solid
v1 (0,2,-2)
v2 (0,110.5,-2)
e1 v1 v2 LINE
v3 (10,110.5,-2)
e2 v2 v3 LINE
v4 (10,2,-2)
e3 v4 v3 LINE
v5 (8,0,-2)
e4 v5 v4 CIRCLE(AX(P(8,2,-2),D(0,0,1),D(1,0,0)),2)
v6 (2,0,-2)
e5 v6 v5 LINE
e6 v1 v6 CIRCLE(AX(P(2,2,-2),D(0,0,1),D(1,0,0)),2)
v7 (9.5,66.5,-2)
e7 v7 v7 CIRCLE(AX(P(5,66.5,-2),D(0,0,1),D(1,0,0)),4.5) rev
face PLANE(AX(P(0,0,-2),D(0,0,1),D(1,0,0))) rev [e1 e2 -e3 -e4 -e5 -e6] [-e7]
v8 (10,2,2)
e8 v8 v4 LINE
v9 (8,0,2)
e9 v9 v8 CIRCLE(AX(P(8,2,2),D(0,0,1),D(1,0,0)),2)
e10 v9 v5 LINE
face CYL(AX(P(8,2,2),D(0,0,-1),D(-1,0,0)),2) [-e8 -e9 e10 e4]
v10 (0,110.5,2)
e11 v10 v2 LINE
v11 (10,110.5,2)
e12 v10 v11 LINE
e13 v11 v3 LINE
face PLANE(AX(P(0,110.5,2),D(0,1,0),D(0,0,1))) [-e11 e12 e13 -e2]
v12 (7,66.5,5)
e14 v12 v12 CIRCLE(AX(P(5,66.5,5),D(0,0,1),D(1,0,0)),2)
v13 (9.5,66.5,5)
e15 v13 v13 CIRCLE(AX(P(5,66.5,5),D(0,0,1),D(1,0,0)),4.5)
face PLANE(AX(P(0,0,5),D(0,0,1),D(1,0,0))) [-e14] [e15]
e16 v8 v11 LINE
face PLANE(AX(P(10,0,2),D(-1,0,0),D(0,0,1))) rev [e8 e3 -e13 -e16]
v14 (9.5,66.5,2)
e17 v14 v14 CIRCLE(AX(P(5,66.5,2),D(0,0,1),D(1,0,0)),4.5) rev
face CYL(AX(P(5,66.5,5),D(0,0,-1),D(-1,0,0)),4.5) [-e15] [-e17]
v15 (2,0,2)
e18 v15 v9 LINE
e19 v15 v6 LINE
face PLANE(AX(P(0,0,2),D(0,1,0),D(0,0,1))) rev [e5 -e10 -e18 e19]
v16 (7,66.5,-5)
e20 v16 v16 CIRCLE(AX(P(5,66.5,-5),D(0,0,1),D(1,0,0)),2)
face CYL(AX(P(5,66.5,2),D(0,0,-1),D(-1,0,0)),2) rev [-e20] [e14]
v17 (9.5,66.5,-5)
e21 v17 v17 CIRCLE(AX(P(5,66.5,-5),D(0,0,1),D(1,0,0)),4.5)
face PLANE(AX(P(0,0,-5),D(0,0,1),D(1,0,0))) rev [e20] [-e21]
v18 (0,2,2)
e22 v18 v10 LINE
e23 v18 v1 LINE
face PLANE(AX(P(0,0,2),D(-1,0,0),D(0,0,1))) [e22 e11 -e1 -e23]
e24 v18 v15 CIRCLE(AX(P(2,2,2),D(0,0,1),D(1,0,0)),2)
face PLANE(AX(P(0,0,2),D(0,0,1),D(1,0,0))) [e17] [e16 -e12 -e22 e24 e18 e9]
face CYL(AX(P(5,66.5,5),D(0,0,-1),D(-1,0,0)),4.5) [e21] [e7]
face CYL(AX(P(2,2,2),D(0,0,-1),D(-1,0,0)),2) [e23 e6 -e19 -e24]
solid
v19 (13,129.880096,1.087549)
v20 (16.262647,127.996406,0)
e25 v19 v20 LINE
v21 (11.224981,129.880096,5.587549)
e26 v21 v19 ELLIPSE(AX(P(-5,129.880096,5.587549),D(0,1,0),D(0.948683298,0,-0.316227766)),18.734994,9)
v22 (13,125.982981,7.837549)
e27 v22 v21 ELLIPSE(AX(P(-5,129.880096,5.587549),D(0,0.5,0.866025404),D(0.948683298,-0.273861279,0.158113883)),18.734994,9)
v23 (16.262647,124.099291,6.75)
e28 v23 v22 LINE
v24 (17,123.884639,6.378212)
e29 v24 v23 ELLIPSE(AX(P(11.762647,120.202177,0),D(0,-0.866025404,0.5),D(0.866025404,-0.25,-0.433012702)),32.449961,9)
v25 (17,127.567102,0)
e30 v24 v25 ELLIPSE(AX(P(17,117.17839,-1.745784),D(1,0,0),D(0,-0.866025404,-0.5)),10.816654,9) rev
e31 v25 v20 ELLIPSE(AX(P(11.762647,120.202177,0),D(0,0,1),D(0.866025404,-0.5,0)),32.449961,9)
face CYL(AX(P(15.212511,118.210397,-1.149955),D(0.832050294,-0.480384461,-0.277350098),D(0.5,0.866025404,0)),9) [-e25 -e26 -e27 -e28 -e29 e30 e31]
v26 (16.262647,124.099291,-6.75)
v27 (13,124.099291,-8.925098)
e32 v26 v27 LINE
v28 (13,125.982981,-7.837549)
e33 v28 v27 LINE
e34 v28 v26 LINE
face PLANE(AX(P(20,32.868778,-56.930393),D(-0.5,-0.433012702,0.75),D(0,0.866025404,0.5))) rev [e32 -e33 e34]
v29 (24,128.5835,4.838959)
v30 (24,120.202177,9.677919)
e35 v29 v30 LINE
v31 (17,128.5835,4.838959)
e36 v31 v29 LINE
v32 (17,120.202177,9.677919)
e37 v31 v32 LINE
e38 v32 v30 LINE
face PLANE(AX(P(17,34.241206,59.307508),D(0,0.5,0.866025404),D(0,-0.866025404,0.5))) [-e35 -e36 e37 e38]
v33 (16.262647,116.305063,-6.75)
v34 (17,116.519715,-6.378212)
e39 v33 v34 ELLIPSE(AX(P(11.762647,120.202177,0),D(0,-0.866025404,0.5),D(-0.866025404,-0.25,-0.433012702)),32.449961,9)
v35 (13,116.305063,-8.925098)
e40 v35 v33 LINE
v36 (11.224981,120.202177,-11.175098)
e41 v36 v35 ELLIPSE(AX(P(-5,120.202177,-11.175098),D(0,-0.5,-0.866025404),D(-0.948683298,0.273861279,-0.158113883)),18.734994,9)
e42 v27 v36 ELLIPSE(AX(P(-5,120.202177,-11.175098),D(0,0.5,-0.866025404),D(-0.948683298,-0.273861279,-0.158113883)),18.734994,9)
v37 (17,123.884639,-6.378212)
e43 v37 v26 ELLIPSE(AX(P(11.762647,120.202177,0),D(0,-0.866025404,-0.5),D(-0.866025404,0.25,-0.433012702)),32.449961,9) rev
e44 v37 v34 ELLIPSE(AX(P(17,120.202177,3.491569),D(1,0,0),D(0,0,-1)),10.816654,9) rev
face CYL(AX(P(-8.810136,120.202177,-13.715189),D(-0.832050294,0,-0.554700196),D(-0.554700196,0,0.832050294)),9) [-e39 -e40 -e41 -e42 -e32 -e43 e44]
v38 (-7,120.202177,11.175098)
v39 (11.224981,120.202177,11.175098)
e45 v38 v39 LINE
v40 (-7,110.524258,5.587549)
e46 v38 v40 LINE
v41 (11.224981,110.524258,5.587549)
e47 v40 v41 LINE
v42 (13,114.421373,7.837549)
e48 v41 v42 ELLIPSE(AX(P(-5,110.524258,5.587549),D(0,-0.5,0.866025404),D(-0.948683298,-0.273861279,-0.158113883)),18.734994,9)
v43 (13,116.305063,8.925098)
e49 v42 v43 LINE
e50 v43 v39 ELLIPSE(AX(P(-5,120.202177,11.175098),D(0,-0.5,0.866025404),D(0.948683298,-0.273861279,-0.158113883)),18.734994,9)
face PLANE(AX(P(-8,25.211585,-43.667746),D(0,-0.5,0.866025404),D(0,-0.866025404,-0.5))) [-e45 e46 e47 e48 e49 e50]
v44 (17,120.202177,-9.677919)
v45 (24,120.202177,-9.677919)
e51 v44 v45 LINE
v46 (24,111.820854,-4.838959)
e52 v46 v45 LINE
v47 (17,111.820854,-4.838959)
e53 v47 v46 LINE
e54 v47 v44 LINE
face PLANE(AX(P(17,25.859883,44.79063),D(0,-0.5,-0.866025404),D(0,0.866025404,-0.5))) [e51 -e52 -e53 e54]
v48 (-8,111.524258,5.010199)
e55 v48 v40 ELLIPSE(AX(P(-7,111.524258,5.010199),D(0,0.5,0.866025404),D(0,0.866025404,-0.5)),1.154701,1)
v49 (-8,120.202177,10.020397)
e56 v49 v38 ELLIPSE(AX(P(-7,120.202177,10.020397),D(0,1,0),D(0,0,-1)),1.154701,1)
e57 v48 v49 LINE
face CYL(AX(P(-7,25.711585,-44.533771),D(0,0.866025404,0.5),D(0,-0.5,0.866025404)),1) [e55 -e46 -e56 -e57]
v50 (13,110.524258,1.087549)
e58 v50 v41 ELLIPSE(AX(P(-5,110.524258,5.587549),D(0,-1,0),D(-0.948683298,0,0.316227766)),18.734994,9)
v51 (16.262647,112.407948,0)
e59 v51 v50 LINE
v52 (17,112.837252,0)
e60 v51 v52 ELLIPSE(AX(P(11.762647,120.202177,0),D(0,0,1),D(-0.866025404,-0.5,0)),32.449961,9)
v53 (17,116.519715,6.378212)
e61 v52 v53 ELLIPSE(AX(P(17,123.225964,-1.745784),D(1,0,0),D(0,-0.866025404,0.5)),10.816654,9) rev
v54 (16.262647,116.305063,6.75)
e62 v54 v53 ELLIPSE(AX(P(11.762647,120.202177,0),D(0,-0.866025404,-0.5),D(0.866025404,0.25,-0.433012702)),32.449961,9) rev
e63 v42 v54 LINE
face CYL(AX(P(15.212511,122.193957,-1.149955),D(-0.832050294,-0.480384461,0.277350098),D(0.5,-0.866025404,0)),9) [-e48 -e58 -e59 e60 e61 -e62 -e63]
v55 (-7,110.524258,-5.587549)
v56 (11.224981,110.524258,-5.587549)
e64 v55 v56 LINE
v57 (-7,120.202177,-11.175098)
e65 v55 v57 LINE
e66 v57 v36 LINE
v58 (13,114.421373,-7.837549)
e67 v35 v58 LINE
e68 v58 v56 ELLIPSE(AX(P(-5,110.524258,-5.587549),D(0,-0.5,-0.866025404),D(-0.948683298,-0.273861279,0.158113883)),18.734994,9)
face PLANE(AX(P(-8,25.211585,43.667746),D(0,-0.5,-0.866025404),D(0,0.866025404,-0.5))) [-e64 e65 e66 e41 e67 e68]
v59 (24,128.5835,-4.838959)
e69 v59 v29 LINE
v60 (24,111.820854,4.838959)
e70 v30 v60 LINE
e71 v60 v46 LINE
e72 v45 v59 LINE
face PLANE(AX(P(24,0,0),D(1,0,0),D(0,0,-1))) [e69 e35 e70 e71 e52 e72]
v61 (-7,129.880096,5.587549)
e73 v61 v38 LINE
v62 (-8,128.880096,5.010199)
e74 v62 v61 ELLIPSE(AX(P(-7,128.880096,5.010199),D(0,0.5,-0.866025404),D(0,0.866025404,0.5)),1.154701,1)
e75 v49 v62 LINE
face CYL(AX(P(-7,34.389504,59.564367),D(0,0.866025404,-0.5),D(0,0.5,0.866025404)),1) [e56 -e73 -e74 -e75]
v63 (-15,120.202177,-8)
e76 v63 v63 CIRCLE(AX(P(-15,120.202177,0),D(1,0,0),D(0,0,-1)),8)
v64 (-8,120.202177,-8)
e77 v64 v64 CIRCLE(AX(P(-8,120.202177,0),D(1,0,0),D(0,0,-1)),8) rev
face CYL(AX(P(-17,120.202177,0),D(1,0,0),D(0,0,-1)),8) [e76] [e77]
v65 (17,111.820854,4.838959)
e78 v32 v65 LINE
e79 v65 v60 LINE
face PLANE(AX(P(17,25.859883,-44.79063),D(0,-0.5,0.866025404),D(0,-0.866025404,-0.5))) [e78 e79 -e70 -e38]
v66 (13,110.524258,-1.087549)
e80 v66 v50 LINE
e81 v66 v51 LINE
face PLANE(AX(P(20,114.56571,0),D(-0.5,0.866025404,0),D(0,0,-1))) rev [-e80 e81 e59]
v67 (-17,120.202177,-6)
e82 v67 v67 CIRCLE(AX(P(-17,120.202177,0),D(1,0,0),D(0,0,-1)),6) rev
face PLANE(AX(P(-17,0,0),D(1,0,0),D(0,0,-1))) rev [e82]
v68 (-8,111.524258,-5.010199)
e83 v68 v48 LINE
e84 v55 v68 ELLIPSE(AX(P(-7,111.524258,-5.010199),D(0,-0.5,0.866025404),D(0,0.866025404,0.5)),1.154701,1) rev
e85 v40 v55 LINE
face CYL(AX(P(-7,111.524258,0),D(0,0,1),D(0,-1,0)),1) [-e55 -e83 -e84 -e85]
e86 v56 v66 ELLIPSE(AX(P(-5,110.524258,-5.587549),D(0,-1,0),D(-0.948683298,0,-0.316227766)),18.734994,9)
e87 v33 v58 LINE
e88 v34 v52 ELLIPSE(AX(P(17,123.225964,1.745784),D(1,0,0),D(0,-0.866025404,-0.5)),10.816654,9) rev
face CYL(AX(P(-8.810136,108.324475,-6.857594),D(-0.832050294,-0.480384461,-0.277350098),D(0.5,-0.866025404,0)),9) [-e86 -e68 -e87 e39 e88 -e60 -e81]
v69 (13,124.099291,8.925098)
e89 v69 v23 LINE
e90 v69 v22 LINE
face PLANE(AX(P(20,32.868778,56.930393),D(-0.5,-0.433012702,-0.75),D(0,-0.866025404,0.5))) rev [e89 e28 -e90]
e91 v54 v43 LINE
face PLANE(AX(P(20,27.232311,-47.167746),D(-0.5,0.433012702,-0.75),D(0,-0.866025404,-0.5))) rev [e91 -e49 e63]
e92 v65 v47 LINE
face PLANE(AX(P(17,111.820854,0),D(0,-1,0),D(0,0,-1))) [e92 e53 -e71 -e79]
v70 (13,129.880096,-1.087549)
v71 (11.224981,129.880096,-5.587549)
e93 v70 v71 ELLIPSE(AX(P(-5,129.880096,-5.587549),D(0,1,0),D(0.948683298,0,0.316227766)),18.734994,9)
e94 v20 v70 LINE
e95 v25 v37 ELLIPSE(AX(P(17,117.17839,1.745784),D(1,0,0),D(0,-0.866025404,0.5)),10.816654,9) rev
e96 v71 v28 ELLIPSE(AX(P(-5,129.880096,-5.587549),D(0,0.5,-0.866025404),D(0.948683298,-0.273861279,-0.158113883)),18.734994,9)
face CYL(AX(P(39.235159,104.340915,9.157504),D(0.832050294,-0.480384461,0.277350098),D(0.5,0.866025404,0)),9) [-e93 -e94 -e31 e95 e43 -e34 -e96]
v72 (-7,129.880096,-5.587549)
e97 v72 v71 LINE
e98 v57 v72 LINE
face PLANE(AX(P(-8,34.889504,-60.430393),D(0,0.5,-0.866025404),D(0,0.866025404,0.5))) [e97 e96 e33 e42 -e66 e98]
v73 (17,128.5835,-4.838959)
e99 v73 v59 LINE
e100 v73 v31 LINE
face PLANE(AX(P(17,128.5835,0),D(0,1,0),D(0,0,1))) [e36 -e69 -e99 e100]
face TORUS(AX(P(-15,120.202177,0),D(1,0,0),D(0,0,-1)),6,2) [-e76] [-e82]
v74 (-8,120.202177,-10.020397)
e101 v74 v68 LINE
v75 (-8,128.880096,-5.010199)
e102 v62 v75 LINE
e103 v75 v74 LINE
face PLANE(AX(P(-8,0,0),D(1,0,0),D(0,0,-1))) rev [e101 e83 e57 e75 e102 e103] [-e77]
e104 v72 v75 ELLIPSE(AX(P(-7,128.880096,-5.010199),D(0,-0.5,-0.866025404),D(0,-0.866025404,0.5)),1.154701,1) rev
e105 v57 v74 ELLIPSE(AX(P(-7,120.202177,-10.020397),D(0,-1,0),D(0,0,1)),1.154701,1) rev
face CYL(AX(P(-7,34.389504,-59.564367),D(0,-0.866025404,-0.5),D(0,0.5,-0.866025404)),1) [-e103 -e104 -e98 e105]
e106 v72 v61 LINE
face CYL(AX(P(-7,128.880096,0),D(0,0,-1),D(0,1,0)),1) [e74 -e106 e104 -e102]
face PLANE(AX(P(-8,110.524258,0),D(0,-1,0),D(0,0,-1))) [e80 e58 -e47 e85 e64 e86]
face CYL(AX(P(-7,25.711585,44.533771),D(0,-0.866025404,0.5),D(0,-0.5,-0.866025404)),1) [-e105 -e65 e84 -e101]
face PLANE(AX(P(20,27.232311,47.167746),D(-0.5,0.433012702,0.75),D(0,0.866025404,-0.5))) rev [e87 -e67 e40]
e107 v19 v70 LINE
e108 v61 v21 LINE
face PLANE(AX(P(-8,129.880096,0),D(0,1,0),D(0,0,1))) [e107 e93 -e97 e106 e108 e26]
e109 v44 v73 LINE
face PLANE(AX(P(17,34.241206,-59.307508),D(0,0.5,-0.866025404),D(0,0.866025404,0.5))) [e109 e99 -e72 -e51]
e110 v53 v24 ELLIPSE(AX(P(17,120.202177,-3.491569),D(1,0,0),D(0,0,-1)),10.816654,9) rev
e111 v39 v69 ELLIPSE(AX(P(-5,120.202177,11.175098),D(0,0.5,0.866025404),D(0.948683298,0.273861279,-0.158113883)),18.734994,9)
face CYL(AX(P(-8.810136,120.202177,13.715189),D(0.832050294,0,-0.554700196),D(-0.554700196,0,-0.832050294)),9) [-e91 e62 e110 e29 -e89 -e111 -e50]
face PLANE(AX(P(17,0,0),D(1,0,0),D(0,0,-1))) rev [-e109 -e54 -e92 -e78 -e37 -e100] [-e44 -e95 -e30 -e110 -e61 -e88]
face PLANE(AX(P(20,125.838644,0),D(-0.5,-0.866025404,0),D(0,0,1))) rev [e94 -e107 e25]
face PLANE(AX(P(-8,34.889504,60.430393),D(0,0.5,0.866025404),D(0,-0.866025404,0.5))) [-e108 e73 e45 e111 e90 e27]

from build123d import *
from OCP.BRepFilletAPI import BRepFilletAPI_MakeChamfer

# Parameters (mm, degrees)
SKETCH1_R                = 4.5
SKETCH1_R_2              = 2
BOSS_EXTRUDE1_DEPTH      = 2
SKETCH1_3_R              = 4.5
SKETCH1_3_R_2            = 2
BOSS_EXTRUDE2_DEPTH      = 5
SKETCH2_R                = 8
BOSS_EXTRUDE3_DEPTH      = 17
BOSS_EXTRUDE5_DEPTH      = 20
BOSS_EXTRUDE5_DEPTH_BACK = 8
SKETCH2_4_R              = 8
FILLET3_R                = 1
FILLET4_R                = 2
CHAMFER1_SIZE            = 7
CHAMFER1_SIZE2           = 4.041451884
FILLET5_R                = 9
BOSS_EXTRUDE6_DEPTH      = 4
BOSS_EXTRUDE6_DEPTH_BACK = 3
BOSS_EXTRUDE6_START      = 20
SKETCH2_7_R              = 8


with BuildPart() as part:
    # Sketch1 → Boss-Extrude1 (new, symmetric)
    # profile 1 of 2: a face of its own
    with BuildSketch(Plane.XY):
        with BuildLine():
            Line((10, 110.5), (0, 110.5))
            Line((0, 110.5), (0, 2))
            ThreePointArc((0, 2), (0.585786438, 0.585786438), (2, 0))
            Line((2, 0), (8, 0))
            ThreePointArc((8, 0), (9.414213562, 0.585786438), (10, 2))
            Line((10, 2), (10, 110.5))
        make_face()
        with Locations((5, 66.5)):
            Circle(SKETCH1_R, mode=Mode.SUBTRACT)
    # profile 2 of 2: a face of its own
    with BuildSketch(Plane.XY):
        with Locations((5, 66.5)):
            Circle(SKETCH1_R)
        with Locations((5, 66.5)):
            Circle(SKETCH1_R_2, mode=Mode.SUBTRACT)
    extrude(amount=BOSS_EXTRUDE1_DEPTH, both=True)

    # Sketch1<3> → Boss-Extrude2 (add, symmetric)
    with BuildSketch(Plane.XY):
        with Locations((5, 66.5)):
            Circle(SKETCH1_3_R)
        with Locations((5, 66.5)):
            Circle(SKETCH1_3_R_2, mode=Mode.SUBTRACT)
    extrude(amount=BOSS_EXTRUDE2_DEPTH, both=True)


with BuildPart() as body_2:
    # Sketch2 → Boss-Extrude3 (new body)
    with BuildSketch(Plane(origin=(0, 0, 0), x_dir=(0, 0, -1), z_dir=(1, 0, 0))):
        with Locations((0, 120.20217709)):
            Circle(SKETCH2_R)
    extrude(amount=-BOSS_EXTRUDE3_DEPTH)

    # Sketch2<4> → Boss-Extrude5 (add, two sides: drawn at the far end of the back side and taken through both)
    # profile 1 of 3: a face of its own
    with BuildSketch(Plane(origin=(0, 0, 0), x_dir=(0, 0, -1), z_dir=(1, 0, 0)).offset(-BOSS_EXTRUDE5_DEPTH_BACK)):
        Polygon((5.587548937, 129.880095739), (-5.587548937, 129.880095739), (-11.175097875, 120.20217709), (-5.587548937, 110.524258441), (5.587548937, 110.524258441), (11.175097875, 120.20217709), align=None)
        with Locations((0, 120.20217709)):
            Circle(SKETCH2_4_R, mode=Mode.SUBTRACT)
    # profile 2 of 3: a face of its own
    with BuildSketch(Plane(origin=(0, 0, 0), x_dir=(0, 0, -1), z_dir=(1, 0, 0)).offset(-BOSS_EXTRUDE5_DEPTH_BACK)):
        Polygon((-4.838959325, 111.820853684), (4.838959325, 111.820853684), (9.677918649, 120.20217709), (4.838959325, 128.583500496), (-4.838959325, 128.583500496), (-9.677918649, 120.20217709), align=None)
        with Locations((0, 120.20217709)):
            Circle(SKETCH2_4_R, mode=Mode.SUBTRACT)
    # profile 3 of 3: a face of its own
    with BuildSketch(Plane(origin=(0, 0, 0), x_dir=(0, 0, -1), z_dir=(1, 0, 0)).offset(-BOSS_EXTRUDE5_DEPTH_BACK)):
        with Locations((0, 120.20217709)):
            Circle(SKETCH2_4_R)
    extrude(amount=BOSS_EXTRUDE5_DEPTH + BOSS_EXTRUDE5_DEPTH_BACK)

    # Fillet3
    fillet3_edges = [body_2.edges().sort_by_distance(p)[0] for p in [
        (-8, 129.880095739, 0),
        (-8, 125.041136415, -8.381323406),
        (-8, 115.363217765, -8.381323406),
        (-8, 110.524258441, 0),
        (-8, 115.363217765, 8.381323406),
        (-8, 125.041136415, 8.381323406),
    ]]
    fillet(fillet3_edges, radius=FILLET3_R)

    # Fillet4
    fillet4_edges = [body_2.edges().sort_by_distance(p)[0] for p in [
        (-17, 120.20217709, 8),
    ]]
    fillet(fillet4_edges, radius=FILLET4_R)

    # Chamfer1: one chamfer whose edges measure the first distance from different faces: ONE call of the kernel's chamfer builder (chamfer() names one face for all edges)
    chamfer1_edges_1 = [body_2.edges().sort_by_distance(p)[0] for p in [
        (20, 110.524258441, 0),
    ]]
    chamfer1_side_1 = [body_2.faces().sort_by_distance(p)[0] for p in [
        (6.5, 110.524258441, 0),
    ]]
    chamfer1_edges_2 = [body_2.edges().sort_by_distance(p)[0] for p in [
        (20, 115.363217765, -8.381323406),
    ]]
    chamfer1_side_2 = [body_2.faces().sort_by_distance(p)[0] for p in [
        (6.5, 115.363217765, -8.381323406),
    ]]
    chamfer1_edges_3 = [body_2.edges().sort_by_distance(p)[0] for p in [
        (20, 125.041136415, -8.381323406),
    ]]
    chamfer1_side_3 = [body_2.faces().sort_by_distance(p)[0] for p in [
        (6.5, 125.041136415, -8.381323406),
    ]]
    chamfer1_edges_4 = [body_2.edges().sort_by_distance(p)[0] for p in [
        (20, 129.880095739, 0),
    ]]
    chamfer1_side_4 = [body_2.faces().sort_by_distance(p)[0] for p in [
        (6.5, 129.880095739, 0),
    ]]
    chamfer1_edges_5 = [body_2.edges().sort_by_distance(p)[0] for p in [
        (20, 125.041136415, 8.381323406),
    ]]
    chamfer1_side_5 = [body_2.faces().sort_by_distance(p)[0] for p in [
        (6.5, 125.041136415, 8.381323406),
    ]]
    chamfer1_edges_6 = [body_2.edges().sort_by_distance(p)[0] for p in [
        (20, 115.363217765, 8.381323406),
    ]]
    chamfer1_side_6 = [body_2.faces().sort_by_distance(p)[0] for p in [
        (6.5, 115.363217765, 8.381323406),
    ]]
    chamfer1 = BRepFilletAPI_MakeChamfer(body_2.part.solid().wrapped)
    for e in chamfer1_edges_1:
        chamfer1.Add(CHAMFER1_SIZE, CHAMFER1_SIZE2, e.wrapped, chamfer1_side_1[0].wrapped)  # the first distance lies on this face
    for e in chamfer1_edges_2:
        chamfer1.Add(CHAMFER1_SIZE, CHAMFER1_SIZE2, e.wrapped, chamfer1_side_2[0].wrapped)  # the first distance lies on this face
    for e in chamfer1_edges_3:
        chamfer1.Add(CHAMFER1_SIZE, CHAMFER1_SIZE2, e.wrapped, chamfer1_side_3[0].wrapped)  # the first distance lies on this face
    for e in chamfer1_edges_4:
        chamfer1.Add(CHAMFER1_SIZE, CHAMFER1_SIZE2, e.wrapped, chamfer1_side_4[0].wrapped)  # the first distance lies on this face
    for e in chamfer1_edges_5:
        chamfer1.Add(CHAMFER1_SIZE, CHAMFER1_SIZE2, e.wrapped, chamfer1_side_5[0].wrapped)  # the first distance lies on this face
    for e in chamfer1_edges_6:
        chamfer1.Add(CHAMFER1_SIZE, CHAMFER1_SIZE2, e.wrapped, chamfer1_side_6[0].wrapped)  # the first distance lies on this face
    add(Compound.cast(chamfer1.Shape()), mode=Mode.REPLACE)

    # Fillet5
    # the kernel refuses this fillet: 9 mm, written as the material it takes off along each edge
    with BuildSketch(Plane(origin=(4.006659268, 120.20217709, 17.170658362), x_dir=(-0.2401922307076287, 0.9013878188660001, -0.36028834606144067), z_dir=(0.8320502943378434, 1.2088901500668617e-15, -0.5547001962252296)), Plane(origin=(4.006659268, 135.072403432, 8.585329181), x_dir=(-0.24019223070763052, 0.13867504905631706, -0.9607689228305214), z_dir=(0.8320502943378435, -0.48038446141525903, -0.27735009811261924))) as fillet5_piece_1:
        with BuildLine():
            CenterArc((FILLET5_R * 0.480384461415, -FILLET5_R), FILLET5_R, 90, 51.317812547)
            Line((-FILLET5_R * 0.300240288385, -FILLET5_R * 0.375), (0, 0))
            Line((0, 0), (FILLET5_R * 0.480384461415, 0))
        make_face()
    extrude(amount=30.03025374, mode=Mode.SUBTRACT)
    with BuildSketch(Plane(origin=(4.006659268, 105.331950748, 8.585329181), x_dir=(-0.24019223070763074, -0.13867504905630562, -0.9607689228305231), z_dir=(0.832050294337843, 0.48038446141526303, -0.27735009811261374)), Plane(origin=(4.006659268, 105.331950748, -8.585329181), x_dir=(-0.24019223070763016, 0.7627127698096926, -0.6004805767690735), z_dir=(0.8320502943378429, 0.4803844614152607, 0.2773500981126182)), Plane(origin=(4.006659268, 120.20217709, -17.170658362), x_dir=(-0.24019223070763193, 0.9013878188659946, 0.36028834606145216), z_dir=(0.8320502943378428, -3.413336894306415e-15, 0.5547001962252306)), Plane(origin=(4.006659268, 135.072403432, -8.585329181), x_dir=(-0.2401922307076317, 0.13867504905629685, 0.960768922830524), z_dir=(0.832050294337843, -0.48038446141526503, 0.27735009811261024))) as fillet5_piece_2:
        with BuildLine():
            CenterArc((FILLET5_R * 0.480384461415, FILLET5_R), FILLET5_R, 218.682187453, 51.317812547)
            Line((-FILLET5_R * 0.300240288385, FILLET5_R * 0.375), (0, 0))
            Line((0, 0), (FILLET5_R * 0.480384461415, 0))
        make_face()
    extrude(amount=30.03025374, mode=Mode.SUBTRACT)

    # Sketch2<7> → Boss-Extrude6 (add, two sides: drawn at the far end of the back side and taken through both)
    # profile 1 of 2: a face of its own
    with BuildSketch(Plane(origin=(0, 0, 0), x_dir=(0, 0, -1), z_dir=(1, 0, 0)).offset(BOSS_EXTRUDE6_START - BOSS_EXTRUDE6_DEPTH_BACK)):
        Polygon((-4.838959325, 111.820853684), (4.838959325, 111.820853684), (9.677918649, 120.20217709), (4.838959325, 128.583500496), (-4.838959325, 128.583500496), (-9.677918649, 120.20217709), align=None)
        with Locations((0, 120.20217709)):
            Circle(SKETCH2_7_R, mode=Mode.SUBTRACT)
    # profile 2 of 2: a face of its own
    with BuildSketch(Plane(origin=(0, 0, 0), x_dir=(0, 0, -1), z_dir=(1, 0, 0)).offset(BOSS_EXTRUDE6_START - BOSS_EXTRUDE6_DEPTH_BACK)):
        with Locations((0, 120.20217709)):
            Circle(SKETCH2_7_R)
    extrude(amount=BOSS_EXTRUDE6_DEPTH + BOSS_EXTRUDE6_DEPTH_BACK)


solid = Compound([part.part, body_2.part])
